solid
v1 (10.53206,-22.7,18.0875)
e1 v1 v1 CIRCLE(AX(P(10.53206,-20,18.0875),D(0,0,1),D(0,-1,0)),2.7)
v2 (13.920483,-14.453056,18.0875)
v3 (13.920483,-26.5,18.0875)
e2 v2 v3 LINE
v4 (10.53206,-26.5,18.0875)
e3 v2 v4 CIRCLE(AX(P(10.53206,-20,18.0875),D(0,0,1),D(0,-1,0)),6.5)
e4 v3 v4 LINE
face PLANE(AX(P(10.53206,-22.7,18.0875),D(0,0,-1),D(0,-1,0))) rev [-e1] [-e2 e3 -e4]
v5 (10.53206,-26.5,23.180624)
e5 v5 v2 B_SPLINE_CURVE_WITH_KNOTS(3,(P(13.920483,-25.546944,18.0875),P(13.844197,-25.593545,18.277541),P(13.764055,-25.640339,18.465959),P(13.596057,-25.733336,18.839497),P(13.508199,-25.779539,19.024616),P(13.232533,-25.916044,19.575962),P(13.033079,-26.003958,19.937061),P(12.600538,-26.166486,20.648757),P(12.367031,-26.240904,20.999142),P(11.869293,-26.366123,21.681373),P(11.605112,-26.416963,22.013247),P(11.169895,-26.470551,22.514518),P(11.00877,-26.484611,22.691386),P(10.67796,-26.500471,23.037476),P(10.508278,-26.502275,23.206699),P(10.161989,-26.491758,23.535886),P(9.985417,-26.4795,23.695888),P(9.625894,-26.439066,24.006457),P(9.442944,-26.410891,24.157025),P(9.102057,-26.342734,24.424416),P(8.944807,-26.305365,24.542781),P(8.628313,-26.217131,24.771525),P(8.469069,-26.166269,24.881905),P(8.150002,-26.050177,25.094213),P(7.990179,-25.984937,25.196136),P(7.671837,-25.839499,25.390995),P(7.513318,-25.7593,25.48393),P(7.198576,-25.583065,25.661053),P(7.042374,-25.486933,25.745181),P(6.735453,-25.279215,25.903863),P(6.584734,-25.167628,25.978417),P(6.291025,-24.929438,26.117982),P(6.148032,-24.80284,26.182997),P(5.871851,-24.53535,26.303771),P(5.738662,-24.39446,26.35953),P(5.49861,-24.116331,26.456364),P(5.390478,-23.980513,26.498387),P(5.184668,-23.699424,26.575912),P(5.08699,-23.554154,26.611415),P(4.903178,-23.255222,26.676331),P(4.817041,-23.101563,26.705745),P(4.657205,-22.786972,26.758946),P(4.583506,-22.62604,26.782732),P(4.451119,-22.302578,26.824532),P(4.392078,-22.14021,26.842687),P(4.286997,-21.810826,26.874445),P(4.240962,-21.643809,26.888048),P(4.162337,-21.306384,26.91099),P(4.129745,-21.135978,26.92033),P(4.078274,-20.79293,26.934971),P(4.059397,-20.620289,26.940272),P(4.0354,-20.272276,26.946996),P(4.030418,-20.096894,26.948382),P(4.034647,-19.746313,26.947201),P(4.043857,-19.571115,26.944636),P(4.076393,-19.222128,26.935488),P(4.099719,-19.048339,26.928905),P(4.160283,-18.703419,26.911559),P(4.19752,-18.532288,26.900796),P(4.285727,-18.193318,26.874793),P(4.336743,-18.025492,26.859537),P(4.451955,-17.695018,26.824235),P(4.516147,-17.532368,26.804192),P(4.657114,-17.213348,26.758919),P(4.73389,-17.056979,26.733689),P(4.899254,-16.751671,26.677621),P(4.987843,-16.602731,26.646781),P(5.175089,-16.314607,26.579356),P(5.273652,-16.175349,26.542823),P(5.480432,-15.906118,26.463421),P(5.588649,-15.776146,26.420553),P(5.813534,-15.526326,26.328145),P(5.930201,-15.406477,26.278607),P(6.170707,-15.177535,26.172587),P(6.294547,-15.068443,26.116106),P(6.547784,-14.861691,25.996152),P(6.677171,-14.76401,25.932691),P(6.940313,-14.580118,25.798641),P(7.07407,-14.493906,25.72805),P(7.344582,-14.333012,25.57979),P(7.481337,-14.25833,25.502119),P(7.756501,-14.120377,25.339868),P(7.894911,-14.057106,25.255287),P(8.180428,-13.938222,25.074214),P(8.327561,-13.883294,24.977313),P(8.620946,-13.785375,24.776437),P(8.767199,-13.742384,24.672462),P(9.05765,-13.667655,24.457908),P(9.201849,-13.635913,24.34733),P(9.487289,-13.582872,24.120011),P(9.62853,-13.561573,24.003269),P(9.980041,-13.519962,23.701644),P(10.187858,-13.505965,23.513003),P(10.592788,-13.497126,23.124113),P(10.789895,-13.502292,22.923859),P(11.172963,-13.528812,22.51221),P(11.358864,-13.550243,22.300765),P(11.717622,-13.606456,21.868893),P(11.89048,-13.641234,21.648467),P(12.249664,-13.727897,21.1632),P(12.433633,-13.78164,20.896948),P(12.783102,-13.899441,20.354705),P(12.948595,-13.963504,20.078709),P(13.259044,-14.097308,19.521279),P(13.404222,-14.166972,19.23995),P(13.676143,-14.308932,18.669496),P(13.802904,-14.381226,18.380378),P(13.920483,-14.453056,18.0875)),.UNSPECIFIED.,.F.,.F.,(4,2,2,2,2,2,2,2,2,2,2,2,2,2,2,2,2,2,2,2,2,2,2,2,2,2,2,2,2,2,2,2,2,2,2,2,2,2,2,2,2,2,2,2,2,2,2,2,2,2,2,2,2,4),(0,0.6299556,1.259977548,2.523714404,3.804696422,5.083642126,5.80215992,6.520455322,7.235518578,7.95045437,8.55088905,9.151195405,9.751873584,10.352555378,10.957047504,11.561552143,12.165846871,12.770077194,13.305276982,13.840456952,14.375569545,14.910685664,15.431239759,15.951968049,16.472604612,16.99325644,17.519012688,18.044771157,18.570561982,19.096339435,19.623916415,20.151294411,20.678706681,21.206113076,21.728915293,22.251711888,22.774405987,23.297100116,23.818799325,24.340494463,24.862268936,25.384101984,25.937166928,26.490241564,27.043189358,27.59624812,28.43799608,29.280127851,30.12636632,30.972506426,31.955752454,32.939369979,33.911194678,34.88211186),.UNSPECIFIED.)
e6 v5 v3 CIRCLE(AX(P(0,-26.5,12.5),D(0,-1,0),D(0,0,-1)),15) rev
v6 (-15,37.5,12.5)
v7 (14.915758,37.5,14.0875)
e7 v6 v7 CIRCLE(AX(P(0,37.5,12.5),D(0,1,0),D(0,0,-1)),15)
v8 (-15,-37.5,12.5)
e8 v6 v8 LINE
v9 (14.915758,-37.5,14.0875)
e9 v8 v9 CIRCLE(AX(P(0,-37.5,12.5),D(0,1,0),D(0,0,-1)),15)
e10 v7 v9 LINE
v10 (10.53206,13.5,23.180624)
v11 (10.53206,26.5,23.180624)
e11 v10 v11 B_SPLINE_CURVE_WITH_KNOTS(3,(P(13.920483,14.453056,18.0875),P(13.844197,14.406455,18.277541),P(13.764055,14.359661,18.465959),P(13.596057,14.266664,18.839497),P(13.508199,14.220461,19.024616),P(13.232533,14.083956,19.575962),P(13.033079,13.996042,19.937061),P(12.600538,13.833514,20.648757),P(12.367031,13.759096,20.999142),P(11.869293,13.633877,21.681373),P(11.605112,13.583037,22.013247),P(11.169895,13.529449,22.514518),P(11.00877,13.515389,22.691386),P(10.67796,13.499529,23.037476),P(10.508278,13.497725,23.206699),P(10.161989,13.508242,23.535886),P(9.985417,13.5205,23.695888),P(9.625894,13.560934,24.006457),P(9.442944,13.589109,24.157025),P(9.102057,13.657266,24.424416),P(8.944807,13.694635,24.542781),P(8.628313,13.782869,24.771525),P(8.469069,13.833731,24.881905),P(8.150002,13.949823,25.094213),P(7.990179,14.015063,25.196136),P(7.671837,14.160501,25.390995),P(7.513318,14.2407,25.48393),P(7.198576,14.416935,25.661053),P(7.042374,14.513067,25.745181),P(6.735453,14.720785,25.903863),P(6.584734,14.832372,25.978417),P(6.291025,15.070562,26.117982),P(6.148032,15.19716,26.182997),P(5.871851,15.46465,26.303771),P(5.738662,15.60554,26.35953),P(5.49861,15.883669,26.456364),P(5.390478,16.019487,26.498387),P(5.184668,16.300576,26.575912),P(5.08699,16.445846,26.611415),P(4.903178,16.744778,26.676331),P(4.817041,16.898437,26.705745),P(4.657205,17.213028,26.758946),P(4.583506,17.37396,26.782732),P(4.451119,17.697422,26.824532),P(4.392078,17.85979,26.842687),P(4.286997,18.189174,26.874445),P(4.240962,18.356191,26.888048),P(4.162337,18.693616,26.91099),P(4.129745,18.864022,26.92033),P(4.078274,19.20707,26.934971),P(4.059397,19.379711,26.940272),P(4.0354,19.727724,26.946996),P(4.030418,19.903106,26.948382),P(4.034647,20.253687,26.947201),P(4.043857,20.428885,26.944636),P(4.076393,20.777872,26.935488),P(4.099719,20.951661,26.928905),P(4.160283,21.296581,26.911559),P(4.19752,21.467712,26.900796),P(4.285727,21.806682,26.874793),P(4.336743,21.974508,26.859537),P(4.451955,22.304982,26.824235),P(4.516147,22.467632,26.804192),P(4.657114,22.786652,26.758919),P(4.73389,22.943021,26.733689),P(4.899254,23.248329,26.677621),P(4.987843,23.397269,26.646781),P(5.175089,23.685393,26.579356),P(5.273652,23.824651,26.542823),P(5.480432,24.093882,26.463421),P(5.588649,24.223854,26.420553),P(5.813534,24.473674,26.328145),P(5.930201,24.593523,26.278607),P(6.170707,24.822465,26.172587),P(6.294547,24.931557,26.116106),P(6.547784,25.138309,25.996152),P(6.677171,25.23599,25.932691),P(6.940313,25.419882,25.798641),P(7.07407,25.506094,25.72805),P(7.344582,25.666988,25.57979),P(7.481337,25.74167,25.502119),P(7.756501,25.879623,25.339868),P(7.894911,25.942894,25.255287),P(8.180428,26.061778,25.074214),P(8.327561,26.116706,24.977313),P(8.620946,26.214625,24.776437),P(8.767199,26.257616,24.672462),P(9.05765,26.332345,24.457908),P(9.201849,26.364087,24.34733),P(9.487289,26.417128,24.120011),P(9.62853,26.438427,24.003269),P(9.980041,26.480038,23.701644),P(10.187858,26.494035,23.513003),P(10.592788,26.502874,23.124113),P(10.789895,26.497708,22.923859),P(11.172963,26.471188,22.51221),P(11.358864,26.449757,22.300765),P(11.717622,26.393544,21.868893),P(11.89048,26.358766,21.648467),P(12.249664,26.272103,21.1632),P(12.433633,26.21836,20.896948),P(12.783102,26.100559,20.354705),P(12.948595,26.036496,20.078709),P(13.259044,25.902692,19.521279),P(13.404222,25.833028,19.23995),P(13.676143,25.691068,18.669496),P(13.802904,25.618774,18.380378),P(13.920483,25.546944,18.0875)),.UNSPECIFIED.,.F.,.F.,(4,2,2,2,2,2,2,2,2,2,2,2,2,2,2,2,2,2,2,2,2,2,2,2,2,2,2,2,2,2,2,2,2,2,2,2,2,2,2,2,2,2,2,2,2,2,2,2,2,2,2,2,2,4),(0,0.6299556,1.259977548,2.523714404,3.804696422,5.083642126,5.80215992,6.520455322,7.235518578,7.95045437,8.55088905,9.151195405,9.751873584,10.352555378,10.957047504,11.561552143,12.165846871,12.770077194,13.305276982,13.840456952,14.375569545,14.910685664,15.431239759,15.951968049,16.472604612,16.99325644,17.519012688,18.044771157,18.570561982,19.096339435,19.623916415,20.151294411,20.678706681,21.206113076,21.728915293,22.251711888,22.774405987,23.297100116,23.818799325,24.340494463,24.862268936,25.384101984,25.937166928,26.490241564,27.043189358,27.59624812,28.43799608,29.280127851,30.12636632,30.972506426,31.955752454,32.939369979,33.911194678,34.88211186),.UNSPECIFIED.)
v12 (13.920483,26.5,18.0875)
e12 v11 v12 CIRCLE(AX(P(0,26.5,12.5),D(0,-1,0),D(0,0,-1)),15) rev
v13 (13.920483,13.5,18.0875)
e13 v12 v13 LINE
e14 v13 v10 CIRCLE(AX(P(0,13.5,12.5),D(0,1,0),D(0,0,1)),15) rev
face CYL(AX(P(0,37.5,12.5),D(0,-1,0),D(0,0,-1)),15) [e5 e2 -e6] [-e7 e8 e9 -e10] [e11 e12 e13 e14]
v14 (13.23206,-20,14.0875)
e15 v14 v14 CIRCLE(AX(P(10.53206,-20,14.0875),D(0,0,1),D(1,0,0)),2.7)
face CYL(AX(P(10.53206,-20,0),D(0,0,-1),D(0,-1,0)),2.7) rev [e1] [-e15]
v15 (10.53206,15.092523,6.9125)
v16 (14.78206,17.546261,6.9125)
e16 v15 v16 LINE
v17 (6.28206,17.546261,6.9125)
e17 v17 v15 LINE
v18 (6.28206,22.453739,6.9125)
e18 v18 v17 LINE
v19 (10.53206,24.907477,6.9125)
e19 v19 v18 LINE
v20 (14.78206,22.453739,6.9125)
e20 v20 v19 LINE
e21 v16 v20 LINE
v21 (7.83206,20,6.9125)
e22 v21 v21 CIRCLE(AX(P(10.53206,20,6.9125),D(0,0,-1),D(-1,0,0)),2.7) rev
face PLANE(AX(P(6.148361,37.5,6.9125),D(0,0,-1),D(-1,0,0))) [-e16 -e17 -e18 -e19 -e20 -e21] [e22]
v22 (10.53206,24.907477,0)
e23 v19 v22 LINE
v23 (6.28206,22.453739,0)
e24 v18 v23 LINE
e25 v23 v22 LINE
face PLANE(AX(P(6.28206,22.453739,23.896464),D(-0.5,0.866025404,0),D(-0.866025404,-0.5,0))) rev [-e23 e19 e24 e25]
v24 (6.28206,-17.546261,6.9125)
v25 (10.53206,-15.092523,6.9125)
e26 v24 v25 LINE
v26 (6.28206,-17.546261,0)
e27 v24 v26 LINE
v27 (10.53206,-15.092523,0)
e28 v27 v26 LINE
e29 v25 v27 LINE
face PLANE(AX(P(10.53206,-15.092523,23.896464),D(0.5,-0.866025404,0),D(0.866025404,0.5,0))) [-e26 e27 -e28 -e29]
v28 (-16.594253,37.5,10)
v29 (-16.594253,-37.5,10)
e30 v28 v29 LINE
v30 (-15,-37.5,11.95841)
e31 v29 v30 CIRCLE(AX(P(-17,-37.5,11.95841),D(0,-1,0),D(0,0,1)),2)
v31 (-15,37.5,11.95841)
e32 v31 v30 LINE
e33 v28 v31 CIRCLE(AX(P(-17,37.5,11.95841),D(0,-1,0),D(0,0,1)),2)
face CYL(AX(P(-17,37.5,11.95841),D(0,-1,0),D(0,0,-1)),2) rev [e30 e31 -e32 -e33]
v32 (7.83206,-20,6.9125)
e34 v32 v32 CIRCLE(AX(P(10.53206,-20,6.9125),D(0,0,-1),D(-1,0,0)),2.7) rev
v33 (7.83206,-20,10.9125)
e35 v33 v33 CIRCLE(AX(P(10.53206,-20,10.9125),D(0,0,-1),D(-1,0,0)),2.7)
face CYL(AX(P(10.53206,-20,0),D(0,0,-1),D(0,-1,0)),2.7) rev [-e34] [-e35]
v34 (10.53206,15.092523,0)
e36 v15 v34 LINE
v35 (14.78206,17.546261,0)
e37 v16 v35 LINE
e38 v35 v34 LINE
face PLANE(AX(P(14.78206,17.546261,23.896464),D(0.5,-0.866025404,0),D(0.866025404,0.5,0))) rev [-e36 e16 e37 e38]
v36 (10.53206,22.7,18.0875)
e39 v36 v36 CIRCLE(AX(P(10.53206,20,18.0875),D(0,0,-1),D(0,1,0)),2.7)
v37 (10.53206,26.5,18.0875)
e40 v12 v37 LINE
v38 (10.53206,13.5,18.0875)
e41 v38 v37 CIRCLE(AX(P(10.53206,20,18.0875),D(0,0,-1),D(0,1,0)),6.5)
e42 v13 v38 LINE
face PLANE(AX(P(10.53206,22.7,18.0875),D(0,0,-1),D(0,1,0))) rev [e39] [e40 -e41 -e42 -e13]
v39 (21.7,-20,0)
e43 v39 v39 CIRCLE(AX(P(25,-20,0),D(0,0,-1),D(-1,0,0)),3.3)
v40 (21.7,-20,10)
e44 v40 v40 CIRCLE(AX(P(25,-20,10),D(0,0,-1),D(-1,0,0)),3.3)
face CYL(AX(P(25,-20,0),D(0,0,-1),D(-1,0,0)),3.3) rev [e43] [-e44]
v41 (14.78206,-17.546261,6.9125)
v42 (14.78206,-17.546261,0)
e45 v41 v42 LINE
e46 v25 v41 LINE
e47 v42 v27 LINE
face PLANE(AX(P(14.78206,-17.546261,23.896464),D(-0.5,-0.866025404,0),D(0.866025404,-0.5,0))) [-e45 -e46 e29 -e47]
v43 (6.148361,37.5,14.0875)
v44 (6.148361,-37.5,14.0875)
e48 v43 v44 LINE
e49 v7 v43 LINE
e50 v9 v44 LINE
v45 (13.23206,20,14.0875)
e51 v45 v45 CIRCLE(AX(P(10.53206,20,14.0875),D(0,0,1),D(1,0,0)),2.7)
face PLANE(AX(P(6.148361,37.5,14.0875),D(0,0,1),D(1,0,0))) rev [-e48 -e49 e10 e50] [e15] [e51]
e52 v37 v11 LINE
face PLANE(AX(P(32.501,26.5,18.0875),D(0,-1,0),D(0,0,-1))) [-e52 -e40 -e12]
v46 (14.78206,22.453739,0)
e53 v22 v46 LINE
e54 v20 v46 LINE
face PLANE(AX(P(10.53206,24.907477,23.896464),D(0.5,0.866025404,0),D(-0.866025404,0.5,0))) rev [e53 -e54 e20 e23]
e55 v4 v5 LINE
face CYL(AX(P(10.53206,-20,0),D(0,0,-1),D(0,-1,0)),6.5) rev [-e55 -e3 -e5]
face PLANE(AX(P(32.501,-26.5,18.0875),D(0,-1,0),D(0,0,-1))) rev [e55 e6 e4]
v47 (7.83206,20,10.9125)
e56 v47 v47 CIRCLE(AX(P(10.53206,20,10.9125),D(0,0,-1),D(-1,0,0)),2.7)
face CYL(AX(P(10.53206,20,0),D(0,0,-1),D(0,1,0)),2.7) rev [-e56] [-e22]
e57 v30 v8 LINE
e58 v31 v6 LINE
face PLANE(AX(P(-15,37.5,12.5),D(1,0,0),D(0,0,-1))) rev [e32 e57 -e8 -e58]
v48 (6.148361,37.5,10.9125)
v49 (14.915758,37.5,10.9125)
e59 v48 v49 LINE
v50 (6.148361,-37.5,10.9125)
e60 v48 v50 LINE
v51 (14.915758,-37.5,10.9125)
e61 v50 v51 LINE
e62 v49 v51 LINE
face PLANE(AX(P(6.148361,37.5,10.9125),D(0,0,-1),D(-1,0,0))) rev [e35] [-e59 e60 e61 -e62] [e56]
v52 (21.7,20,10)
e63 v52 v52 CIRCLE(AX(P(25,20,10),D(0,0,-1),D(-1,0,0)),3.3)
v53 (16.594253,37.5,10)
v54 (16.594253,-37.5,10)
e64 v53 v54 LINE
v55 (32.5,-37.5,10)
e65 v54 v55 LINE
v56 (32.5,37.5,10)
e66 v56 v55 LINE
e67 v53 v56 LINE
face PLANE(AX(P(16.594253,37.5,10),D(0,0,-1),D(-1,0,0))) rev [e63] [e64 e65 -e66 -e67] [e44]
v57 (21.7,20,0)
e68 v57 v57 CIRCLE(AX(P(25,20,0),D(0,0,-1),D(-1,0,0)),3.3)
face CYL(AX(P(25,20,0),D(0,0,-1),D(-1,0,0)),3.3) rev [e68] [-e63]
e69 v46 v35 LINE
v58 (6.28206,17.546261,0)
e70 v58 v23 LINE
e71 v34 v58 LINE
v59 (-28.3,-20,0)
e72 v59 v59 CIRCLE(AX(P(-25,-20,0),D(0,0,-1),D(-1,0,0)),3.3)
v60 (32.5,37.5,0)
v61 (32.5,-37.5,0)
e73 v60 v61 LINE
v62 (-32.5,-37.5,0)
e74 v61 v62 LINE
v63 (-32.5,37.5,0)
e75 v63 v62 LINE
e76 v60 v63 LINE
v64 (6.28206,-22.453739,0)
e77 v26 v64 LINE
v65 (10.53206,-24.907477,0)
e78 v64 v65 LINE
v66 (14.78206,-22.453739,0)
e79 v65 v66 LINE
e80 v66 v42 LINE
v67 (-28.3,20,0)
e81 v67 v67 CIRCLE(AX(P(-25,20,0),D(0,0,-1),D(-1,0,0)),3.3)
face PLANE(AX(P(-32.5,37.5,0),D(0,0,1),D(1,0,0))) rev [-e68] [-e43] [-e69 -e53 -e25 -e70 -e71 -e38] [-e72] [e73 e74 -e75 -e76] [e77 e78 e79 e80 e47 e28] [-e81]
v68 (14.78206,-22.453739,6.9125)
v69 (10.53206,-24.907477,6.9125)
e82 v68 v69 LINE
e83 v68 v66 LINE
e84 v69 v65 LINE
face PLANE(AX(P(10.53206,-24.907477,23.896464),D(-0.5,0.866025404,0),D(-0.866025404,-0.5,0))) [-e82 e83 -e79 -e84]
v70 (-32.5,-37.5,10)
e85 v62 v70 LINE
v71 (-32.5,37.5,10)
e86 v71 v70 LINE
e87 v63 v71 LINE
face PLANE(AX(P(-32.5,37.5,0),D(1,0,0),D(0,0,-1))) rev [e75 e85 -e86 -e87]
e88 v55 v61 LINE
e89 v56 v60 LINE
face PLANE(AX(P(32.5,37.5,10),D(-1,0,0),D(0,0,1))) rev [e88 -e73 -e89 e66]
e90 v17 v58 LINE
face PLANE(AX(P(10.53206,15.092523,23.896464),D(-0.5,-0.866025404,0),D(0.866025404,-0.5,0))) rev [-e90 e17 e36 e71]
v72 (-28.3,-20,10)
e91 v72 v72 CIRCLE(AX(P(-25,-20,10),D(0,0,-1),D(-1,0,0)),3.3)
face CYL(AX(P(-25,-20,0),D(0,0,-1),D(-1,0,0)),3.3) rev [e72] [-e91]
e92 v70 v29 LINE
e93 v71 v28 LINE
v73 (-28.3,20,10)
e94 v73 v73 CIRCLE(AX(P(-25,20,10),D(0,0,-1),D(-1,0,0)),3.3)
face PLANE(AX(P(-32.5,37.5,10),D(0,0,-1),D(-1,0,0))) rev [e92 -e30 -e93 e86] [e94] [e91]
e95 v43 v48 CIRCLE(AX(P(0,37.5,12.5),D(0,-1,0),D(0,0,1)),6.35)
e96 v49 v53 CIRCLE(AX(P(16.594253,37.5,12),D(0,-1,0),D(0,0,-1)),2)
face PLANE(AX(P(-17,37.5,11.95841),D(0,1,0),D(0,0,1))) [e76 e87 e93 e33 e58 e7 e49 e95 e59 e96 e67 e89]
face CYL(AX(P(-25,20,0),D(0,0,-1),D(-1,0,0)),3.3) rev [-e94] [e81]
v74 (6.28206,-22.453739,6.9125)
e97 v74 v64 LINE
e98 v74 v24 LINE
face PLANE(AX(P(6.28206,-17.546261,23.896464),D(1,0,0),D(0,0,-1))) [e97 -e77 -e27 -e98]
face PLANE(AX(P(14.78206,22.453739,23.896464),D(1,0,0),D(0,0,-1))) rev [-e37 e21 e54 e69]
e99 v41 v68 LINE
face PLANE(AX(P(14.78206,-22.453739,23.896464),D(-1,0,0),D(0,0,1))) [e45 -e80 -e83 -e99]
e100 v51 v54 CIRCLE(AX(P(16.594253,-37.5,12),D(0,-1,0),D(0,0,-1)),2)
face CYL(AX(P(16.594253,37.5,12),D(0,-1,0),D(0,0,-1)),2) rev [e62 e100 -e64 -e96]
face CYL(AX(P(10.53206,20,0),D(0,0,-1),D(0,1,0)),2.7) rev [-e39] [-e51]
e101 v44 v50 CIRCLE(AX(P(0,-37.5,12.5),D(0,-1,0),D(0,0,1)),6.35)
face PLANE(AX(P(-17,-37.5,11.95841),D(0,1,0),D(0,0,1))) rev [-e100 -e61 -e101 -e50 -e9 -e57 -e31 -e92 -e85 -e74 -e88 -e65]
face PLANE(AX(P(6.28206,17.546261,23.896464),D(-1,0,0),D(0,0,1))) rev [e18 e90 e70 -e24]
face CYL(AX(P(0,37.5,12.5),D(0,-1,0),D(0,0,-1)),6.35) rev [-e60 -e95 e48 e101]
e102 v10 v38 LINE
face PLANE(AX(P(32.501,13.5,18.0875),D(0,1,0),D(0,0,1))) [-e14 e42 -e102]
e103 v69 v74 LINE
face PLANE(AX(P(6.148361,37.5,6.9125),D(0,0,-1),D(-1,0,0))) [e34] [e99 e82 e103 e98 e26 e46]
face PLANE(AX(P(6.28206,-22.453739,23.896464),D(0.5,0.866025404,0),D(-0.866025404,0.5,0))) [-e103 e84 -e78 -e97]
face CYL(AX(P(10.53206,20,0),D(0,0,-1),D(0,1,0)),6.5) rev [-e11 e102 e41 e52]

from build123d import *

# Parameters (mm, degrees)
BOSS_EXTRUDE1_DEPTH  = 37.5
M6_CLEARANCE_HOLE1_D = 6.6
SKETCH7_W            = 9.4125
SKETCH7_H            = 13
CUT_EXTRUDE1_DEPTH   = 3.388423
CUT_EXTRUDE3_DEPTH   = 6.9125
MIRROR1_START        = 18.0875
MIRROR1_DEPTH        = 8.860423859
MIRROR1_2_DEPTH      = 6.9125
MIRROR1_START_2      = 6.9125
MIRROR1_3_OUTLINE_R  = 2.7
MIRROR1_3_DEPTH      = 11.175


# Read off the part's stored shape, not the designer's step: Mirror1
with BuildPart() as part:
    # Sketch1 → Boss-Extrude1 (new, symmetric)
    with BuildSketch(Plane(origin=(0, 0, 0), x_dir=(1, 0, 0), z_dir=(0, 1, 0))):
        with BuildLine():
            Line((-32.5, 0), (32.5, 0))
            Line((32.5, 0), (32.5, -10))
            Line((32.5, -10), (16.594252725, -10))
            ThreePointArc((16.594252725, -10), (15.639004066, -10.242871661), (14.915758236, -10.9125))
            Line((14.915758236, -10.9125), (6.148361062, -10.9125))
            ThreePointArc((6.148361062, -10.9125), (-6.35, -12.5), (6.148361062, -14.0875))
            Line((6.148361062, -14.0875), (14.915758236, -14.0875))
            ThreePointArc((14.915758236, -14.0875), (-0.794866801, -27.478924753), (-15, -12.5))
            Line((-15, -12.5), (-15, -11.958409852))
            ThreePointArc((-15, -11.958409852), (-15.448952846, -10.695772642), (-16.594252725, -10))
            Line((-16.594252725, -10), (-32.5, -10))
            Line((-32.5, -10), (-32.5, 0))
        make_face()
    extrude(amount=BOSS_EXTRUDE1_DEPTH, both=True)

    # M6 Clearance Hole1 (through all)
    with Locations(Plane(origin=(0, 0, 0), x_dir=(-1, 0, 0), z_dir=(0, 0, -1))):
        with Locations((25, -20), (-25, 20), (-25, -20), (25, 20)):
            Hole(M6_CLEARANCE_HOLE1_D / 2)

    # Sketch6 → Cut-Revolve1 (revolve, cut)
    with BuildSketch(Plane(origin=(10.532059649, 0, 0), x_dir=(0, 0, -1), z_dir=(1, 0, 0))):
        Polygon((0, 20), (-27.5, 20), (-27.5, 26.5), (-18.0875, 26.5), (-18.0875, 22.7), (0, 22.7), align=None)
    revolve(axis=Axis((10.532059649, 20, 0), (0, 0, 1)), mode=Mode.SUBTRACT)

    # Sketch7 → Cut-Extrude1 (cut)
    with BuildSketch(Plane(origin=(10.532059649, 0, 0), x_dir=(0, 0, -1), z_dir=(1, 0, 0))):
        with Locations((-22.79375, 20)):
            Rectangle(SKETCH7_W, SKETCH7_H)
    extrude(amount=CUT_EXTRUDE1_DEPTH, mode=Mode.SUBTRACT)

    # Sketch9 → Cut-Extrude3 (cut)
    with BuildSketch(Plane(origin=(0, 0, 0), x_dir=(-1, 0, 0), z_dir=(0, 0, -1))):
        Polygon((-6.282059649, 17.546261356), (-6.282059649, 22.453738644), (-10.532059649, 24.907477288), (-14.782059649, 22.453738644), (-14.782059649, 17.546261356), (-10.532059649, 15.092522712), align=None)
    extrude(amount=-CUT_EXTRUDE3_DEPTH, mode=Mode.SUBTRACT)

    # Mirror1 outline → Mirror1 (cut)
    with BuildSketch(Plane.XY.offset(MIRROR1_START)):
        with BuildLine():
            ThreePointArc((13.920482885, -14.453055979), (4.274858352, -18.240047747), (10.532059649, -26.5))
            Line((10.532059649, -26.5), (16, -26.5))
            Line((16, -26.5), (16, -15.723356181))
            Line((16, -15.723356181), (13.920482885, -14.453055979))
        make_face()
    extrude(amount=MIRROR1_DEPTH, mode=Mode.SUBTRACT)

    # Mirror1 2 outline → Mirror1 2 (cut)
    with BuildSketch(Plane.XY):
        Polygon((14.782059649, -22.453738644), (14.782059649, -17.546261356), (10.532059649, -15.092522712), (6.282059649, -17.546261356), (6.282059649, -22.453738644), (10.532059649, -24.907477288), align=None)
    extrude(amount=MIRROR1_2_DEPTH, mode=Mode.SUBTRACT)

    # Mirror1 3 outline → Mirror1 3 (cut)
    with BuildSketch(Plane.XY.offset(MIRROR1_START_2)):
        with Locations((10.532059649, -20)):
            Circle(MIRROR1_3_OUTLINE_R)
    extrude(amount=MIRROR1_3_DEPTH, mode=Mode.SUBTRACT)


solid = part.part
